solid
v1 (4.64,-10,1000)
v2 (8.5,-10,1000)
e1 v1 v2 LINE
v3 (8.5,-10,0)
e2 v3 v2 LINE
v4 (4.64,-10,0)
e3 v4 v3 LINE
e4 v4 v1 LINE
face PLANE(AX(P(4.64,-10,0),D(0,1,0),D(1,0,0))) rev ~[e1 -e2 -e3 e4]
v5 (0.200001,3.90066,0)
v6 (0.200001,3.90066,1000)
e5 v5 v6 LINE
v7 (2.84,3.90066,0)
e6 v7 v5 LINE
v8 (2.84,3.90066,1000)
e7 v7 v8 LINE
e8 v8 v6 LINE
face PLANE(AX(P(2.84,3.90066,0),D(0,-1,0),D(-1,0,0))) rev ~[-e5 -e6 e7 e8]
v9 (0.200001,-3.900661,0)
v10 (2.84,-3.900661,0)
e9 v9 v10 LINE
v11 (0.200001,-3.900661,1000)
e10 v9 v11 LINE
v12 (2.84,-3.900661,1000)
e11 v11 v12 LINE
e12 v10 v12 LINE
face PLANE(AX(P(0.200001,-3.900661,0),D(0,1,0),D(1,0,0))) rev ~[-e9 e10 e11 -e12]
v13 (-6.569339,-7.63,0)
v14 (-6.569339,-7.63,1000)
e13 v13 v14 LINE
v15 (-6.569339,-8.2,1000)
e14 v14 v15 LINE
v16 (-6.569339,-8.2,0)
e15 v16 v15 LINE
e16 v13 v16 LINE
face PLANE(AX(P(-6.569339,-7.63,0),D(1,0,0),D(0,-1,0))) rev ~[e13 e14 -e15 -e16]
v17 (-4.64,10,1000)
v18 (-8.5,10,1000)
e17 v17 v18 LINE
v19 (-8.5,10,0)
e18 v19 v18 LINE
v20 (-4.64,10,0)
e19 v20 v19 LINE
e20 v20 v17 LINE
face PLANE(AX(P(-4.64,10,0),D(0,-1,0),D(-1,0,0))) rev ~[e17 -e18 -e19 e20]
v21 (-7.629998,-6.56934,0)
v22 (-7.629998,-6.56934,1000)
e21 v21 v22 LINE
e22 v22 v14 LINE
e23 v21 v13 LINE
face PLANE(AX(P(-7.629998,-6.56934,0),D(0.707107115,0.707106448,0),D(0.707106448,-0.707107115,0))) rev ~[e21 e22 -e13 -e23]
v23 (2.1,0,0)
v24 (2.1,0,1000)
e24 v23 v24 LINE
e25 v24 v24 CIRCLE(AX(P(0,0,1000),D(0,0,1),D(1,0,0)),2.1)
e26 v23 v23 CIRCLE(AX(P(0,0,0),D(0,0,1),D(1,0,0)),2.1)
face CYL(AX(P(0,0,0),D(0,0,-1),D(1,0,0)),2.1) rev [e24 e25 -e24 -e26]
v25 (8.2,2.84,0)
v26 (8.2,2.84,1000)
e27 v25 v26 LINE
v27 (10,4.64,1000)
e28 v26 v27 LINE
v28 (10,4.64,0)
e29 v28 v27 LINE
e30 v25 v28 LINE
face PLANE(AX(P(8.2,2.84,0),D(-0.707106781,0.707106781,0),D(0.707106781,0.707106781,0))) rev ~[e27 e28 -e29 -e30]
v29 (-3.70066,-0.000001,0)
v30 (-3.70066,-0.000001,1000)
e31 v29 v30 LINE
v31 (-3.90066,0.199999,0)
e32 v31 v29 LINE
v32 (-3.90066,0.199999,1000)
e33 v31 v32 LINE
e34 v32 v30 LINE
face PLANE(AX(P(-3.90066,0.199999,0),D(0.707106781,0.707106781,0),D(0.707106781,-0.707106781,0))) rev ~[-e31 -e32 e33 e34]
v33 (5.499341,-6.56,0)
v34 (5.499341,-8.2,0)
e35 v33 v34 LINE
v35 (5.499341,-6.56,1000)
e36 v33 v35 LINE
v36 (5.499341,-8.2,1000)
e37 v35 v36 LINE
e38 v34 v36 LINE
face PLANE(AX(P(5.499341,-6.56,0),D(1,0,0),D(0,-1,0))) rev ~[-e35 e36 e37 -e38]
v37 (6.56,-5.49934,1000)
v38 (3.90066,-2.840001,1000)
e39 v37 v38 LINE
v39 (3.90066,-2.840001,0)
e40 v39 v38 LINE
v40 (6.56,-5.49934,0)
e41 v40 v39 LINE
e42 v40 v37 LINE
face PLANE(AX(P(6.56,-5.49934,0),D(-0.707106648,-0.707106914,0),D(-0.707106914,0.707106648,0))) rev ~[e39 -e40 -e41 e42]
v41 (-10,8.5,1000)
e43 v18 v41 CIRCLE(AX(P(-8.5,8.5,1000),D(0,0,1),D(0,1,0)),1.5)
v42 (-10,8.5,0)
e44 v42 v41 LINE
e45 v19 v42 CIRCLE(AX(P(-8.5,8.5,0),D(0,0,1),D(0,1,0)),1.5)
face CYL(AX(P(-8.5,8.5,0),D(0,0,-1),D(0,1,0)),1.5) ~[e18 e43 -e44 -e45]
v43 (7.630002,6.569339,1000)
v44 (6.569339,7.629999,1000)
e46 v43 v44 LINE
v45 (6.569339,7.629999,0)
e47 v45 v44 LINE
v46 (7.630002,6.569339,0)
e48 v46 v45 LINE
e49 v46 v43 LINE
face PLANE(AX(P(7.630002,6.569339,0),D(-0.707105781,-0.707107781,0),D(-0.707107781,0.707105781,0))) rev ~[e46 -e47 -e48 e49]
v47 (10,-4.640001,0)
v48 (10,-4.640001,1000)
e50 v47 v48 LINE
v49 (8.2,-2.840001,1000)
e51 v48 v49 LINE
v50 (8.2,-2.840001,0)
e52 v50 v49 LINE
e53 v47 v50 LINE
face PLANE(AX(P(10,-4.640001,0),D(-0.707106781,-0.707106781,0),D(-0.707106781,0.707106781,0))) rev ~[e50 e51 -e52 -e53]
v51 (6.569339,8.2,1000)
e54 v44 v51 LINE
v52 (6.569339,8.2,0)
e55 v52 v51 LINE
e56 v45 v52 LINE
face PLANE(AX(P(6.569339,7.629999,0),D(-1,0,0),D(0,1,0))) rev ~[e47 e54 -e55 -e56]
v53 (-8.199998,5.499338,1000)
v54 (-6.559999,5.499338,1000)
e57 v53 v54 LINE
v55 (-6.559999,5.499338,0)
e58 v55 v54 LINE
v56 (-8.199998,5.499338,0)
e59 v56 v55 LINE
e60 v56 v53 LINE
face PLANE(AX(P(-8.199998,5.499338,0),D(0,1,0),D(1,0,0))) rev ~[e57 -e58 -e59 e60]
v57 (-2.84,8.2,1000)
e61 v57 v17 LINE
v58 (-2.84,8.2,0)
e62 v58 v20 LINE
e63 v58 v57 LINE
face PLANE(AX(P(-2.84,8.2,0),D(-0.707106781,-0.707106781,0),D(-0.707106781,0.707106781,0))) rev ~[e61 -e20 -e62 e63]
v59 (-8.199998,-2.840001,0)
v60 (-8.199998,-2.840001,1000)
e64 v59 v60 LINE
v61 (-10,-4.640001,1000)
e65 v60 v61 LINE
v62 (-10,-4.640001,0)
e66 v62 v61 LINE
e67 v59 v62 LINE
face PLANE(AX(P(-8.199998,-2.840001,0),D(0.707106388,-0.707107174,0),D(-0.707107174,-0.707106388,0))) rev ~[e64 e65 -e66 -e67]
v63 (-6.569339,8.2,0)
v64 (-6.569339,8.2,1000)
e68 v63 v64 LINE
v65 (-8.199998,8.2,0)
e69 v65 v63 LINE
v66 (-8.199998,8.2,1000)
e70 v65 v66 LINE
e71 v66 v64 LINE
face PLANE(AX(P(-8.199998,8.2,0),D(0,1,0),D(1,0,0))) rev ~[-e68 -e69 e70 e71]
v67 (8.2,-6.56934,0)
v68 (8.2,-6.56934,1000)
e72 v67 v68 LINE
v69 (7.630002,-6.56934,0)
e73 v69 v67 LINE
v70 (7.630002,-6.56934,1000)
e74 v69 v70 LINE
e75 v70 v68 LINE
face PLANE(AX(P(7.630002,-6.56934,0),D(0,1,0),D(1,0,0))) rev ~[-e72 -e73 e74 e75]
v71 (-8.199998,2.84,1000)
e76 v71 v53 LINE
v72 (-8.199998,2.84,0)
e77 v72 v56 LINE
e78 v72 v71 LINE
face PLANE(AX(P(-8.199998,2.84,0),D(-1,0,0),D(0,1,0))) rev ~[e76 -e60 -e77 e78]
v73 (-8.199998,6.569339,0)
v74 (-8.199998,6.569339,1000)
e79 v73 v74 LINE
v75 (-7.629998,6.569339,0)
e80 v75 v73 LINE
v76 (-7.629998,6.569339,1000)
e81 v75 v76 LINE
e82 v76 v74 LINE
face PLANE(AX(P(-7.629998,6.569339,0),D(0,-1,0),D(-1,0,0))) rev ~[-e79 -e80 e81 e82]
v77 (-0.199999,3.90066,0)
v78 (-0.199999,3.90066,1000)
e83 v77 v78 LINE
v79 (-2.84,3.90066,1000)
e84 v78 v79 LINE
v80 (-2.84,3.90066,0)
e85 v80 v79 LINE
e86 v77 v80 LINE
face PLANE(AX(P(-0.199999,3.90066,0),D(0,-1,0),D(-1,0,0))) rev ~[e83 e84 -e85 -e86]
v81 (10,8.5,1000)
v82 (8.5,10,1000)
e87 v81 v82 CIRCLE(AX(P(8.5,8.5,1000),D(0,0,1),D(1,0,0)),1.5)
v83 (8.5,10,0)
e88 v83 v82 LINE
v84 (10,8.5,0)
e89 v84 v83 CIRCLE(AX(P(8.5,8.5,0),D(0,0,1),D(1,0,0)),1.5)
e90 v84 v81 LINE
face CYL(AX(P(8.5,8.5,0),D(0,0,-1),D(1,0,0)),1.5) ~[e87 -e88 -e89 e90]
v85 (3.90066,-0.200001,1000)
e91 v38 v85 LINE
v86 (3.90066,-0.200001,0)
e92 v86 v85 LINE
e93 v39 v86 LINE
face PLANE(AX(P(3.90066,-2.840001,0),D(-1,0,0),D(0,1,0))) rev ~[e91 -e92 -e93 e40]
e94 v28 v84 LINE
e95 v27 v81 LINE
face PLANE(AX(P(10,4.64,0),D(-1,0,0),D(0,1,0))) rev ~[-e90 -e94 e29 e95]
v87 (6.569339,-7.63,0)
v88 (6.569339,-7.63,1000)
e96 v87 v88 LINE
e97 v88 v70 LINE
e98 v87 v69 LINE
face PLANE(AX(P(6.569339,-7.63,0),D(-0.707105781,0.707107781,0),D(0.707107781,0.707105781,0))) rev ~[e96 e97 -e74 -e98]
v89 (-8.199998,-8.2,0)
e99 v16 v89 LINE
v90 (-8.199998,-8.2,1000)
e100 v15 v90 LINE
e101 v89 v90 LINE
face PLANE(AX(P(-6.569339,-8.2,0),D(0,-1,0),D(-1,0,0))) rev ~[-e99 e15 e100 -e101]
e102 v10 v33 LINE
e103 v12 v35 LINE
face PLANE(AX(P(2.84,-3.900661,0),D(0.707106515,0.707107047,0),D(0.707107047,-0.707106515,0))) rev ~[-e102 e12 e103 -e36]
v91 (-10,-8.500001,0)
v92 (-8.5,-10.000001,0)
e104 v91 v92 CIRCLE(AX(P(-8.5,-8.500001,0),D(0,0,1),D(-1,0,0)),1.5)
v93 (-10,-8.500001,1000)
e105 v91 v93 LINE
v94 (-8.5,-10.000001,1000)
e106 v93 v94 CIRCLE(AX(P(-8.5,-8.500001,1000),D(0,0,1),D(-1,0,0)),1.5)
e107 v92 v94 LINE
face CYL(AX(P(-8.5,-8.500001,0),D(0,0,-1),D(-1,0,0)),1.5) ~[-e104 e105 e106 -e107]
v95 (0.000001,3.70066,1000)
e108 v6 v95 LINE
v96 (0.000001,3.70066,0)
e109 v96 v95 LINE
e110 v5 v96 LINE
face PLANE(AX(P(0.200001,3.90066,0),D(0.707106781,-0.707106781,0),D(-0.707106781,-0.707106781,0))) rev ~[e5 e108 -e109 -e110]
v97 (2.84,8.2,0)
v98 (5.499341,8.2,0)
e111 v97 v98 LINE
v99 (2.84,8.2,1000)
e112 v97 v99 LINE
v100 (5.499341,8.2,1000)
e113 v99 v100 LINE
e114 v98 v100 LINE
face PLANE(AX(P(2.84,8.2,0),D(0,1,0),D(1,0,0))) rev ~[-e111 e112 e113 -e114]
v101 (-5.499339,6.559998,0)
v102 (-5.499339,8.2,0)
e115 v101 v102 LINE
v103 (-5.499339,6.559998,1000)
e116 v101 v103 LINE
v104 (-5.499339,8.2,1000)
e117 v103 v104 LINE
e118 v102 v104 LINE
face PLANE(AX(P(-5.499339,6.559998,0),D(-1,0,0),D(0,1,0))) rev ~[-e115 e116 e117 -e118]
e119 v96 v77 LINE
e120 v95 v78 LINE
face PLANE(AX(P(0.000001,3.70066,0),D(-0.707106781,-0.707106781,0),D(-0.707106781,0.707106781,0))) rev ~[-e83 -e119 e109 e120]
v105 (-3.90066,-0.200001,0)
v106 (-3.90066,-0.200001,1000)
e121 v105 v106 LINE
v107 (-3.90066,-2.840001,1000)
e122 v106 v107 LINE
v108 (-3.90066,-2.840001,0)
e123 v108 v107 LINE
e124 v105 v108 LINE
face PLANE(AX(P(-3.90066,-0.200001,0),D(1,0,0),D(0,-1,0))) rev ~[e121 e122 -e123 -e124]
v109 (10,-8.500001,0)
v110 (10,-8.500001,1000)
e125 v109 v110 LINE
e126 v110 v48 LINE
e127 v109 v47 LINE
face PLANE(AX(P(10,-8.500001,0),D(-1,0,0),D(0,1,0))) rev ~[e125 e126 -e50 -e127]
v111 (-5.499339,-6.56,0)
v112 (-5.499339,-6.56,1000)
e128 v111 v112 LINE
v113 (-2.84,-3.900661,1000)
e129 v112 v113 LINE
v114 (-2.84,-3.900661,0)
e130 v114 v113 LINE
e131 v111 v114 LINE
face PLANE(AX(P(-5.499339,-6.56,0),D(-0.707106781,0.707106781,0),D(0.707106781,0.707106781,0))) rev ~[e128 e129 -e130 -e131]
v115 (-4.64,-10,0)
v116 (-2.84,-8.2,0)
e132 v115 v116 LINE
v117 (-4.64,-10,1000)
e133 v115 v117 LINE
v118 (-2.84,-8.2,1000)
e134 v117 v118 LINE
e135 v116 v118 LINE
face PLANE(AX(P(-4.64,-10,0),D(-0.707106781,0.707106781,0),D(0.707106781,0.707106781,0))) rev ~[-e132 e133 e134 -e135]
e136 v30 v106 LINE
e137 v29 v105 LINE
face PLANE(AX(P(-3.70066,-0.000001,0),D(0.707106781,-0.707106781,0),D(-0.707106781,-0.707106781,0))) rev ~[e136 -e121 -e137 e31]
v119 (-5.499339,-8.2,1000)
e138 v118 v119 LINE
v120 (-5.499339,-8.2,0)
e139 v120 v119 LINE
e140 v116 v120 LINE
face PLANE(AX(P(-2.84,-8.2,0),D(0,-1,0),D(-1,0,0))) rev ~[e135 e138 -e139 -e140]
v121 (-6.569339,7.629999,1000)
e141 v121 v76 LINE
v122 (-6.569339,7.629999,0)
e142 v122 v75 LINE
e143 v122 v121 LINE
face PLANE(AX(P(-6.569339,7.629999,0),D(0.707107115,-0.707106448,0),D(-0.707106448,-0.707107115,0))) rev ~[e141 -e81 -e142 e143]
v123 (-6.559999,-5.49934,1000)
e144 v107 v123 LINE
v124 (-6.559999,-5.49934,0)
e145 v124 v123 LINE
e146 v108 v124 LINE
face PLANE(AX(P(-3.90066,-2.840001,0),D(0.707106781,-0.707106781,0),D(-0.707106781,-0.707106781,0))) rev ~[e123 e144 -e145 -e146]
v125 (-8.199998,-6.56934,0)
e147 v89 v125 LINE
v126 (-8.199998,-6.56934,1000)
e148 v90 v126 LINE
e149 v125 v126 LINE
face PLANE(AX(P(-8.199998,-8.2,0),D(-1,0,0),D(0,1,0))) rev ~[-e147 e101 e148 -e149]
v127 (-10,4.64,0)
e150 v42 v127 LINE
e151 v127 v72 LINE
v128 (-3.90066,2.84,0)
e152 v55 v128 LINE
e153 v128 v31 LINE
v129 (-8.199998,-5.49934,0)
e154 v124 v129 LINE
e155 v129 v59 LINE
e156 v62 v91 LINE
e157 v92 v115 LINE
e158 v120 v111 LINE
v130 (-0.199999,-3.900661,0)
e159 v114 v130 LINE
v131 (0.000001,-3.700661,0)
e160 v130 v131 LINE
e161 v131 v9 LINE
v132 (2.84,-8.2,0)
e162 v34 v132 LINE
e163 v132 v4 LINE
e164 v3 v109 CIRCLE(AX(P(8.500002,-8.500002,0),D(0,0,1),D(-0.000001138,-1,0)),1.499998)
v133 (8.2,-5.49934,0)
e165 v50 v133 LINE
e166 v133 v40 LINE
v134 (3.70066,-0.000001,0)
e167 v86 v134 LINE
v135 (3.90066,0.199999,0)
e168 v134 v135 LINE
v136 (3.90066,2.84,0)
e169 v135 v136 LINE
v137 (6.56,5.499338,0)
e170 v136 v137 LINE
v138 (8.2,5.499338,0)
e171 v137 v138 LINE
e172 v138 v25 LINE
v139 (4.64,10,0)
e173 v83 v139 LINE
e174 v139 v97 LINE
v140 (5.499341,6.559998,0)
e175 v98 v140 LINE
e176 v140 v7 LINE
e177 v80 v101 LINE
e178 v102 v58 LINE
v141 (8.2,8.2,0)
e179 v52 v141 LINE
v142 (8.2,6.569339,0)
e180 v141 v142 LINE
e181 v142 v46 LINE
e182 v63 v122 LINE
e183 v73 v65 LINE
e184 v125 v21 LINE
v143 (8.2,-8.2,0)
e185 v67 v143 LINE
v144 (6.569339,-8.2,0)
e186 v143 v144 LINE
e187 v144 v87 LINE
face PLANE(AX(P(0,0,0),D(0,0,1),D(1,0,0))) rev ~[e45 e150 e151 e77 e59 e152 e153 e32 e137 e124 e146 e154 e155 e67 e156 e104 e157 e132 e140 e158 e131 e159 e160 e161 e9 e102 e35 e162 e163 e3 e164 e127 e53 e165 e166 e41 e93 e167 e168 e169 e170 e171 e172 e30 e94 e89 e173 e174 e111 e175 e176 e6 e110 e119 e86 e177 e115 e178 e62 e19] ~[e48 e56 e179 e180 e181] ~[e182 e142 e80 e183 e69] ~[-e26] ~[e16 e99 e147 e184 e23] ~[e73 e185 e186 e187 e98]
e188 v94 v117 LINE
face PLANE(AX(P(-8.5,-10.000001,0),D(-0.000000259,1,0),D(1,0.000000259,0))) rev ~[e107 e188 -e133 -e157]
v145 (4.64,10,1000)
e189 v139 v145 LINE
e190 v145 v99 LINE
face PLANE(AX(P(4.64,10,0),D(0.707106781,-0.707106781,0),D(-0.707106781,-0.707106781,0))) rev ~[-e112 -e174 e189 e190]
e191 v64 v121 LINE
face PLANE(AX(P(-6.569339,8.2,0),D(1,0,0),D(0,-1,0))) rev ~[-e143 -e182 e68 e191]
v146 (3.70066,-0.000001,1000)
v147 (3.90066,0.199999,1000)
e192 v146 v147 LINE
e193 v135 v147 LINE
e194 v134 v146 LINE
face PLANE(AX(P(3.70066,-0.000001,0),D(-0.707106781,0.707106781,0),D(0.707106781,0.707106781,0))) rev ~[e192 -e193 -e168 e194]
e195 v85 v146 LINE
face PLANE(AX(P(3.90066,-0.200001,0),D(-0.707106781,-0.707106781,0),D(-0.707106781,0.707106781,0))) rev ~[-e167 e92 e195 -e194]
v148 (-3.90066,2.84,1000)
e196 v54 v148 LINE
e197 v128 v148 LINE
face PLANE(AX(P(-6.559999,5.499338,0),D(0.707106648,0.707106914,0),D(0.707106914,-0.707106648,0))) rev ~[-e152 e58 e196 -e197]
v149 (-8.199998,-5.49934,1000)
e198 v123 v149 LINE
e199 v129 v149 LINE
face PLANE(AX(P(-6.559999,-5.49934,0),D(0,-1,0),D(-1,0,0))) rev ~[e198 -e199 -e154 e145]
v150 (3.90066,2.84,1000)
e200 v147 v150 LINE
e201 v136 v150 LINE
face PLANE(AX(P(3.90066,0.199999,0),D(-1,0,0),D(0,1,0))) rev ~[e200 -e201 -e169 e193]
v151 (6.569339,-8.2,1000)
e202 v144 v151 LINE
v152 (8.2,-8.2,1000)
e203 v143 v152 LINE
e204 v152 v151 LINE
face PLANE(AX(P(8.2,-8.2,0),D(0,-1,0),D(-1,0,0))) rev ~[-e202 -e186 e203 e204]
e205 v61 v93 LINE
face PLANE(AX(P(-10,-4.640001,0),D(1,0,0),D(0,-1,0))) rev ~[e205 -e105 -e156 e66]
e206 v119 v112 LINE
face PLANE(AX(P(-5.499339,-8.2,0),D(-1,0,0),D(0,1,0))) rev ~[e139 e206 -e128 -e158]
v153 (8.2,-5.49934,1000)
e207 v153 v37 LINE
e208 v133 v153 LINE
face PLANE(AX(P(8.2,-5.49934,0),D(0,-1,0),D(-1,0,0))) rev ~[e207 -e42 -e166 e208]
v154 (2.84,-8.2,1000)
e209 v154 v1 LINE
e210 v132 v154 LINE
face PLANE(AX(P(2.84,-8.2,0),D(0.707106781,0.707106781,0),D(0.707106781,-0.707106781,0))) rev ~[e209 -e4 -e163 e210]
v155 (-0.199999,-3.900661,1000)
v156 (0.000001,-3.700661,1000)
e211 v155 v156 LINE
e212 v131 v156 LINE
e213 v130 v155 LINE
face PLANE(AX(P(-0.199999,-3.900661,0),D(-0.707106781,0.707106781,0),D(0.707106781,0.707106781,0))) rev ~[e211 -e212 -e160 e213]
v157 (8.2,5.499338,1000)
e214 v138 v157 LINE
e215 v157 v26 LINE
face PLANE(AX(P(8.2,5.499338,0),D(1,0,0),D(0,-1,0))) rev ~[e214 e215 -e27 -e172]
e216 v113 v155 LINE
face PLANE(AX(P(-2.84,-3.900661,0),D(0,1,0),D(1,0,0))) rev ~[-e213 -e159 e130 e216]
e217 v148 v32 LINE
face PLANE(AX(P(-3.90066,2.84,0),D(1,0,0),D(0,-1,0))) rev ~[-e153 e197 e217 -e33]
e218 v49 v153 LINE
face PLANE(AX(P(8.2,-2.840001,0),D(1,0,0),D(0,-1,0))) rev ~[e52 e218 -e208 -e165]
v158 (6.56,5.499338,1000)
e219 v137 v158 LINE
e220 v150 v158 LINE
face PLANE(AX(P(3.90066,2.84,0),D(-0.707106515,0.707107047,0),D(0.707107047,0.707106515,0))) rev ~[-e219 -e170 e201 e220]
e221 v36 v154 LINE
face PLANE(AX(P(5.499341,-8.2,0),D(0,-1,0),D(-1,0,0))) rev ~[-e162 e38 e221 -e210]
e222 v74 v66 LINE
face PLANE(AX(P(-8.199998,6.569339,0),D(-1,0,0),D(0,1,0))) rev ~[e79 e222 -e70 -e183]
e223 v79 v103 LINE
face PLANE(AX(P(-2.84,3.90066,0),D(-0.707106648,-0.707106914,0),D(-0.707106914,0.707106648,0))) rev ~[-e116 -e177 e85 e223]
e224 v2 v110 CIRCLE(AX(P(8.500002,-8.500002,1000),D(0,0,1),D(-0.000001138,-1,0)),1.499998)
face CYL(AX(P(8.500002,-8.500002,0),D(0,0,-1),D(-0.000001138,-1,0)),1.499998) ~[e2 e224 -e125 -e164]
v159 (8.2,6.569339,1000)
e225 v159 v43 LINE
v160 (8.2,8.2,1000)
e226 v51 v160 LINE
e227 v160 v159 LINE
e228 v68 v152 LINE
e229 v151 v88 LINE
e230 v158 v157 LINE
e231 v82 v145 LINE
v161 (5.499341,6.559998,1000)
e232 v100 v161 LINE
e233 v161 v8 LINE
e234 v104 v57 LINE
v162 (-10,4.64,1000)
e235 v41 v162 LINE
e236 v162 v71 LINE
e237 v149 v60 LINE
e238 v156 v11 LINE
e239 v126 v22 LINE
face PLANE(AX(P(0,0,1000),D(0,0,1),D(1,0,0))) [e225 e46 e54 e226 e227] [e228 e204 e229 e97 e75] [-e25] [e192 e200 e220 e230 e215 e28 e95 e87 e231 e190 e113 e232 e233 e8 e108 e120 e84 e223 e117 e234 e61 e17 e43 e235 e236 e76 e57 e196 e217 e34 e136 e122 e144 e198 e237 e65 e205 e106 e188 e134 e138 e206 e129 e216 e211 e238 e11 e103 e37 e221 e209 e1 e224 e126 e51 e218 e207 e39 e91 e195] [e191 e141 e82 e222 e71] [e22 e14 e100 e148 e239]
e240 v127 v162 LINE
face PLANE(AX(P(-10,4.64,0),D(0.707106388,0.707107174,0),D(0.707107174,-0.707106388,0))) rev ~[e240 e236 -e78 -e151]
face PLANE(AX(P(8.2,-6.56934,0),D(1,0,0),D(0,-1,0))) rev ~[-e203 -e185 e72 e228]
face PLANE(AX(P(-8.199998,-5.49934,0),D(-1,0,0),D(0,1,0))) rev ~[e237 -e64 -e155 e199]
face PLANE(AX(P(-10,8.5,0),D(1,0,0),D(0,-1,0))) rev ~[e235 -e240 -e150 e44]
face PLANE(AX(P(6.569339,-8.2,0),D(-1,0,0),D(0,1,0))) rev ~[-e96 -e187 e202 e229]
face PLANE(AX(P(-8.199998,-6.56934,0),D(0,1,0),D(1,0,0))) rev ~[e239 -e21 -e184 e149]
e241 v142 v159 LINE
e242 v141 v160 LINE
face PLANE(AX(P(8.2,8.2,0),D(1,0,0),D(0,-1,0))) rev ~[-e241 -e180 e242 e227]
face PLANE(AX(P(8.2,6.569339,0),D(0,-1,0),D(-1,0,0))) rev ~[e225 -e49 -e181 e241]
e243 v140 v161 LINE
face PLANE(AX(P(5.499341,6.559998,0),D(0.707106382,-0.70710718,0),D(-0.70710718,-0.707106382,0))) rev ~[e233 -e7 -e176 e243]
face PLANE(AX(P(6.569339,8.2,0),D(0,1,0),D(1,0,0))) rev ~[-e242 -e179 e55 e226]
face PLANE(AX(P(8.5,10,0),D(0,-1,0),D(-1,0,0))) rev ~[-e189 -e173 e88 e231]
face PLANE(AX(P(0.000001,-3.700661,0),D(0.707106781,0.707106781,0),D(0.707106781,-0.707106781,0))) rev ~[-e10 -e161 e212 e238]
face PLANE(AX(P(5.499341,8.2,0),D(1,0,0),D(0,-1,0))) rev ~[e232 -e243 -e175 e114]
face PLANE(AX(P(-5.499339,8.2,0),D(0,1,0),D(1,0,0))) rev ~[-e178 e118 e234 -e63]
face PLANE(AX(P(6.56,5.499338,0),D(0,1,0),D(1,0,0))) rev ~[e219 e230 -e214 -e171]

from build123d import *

# Parameters (mm, degrees)
F0_R     = 2.09999979
F1_DEPTH = 1000


# Not quite as in the source:
# - ends of sketch curves that miss each other by under 0.0002 mm in the source are joined


with BuildPart() as f1:
    # F0 (on Top) → F1 (new body)
    with BuildSketch(Plane.XY):
        with BuildLine():
            Line((-4.639999536, 10), (-8.50000015, 10))
            ThreePointArc((-8.50000015, 10), (-9.5606602157, 9.5606602157), (-10, 8.50000015))
            Line((-10, 8.50000015), (-10, 4.639999536))
            Line((-10, 4.639999536), (-8.19999818, 2.839999716))
            Line((-8.19999818, 2.839999716), (-8.19999818, 5.4993384501))
            Line((-8.19999818, 5.4993384501), (-6.559999344, 5.4993384501))
            Line((-6.559999344, 5.4993384501), (-3.9006596099, 2.839999716))
            Line((-3.9006596099, 2.839999716), (-3.9006596099, 0.19999898))
            Line((-3.9006596099, 0.19999898), (-3.7006596299, -1e-06))
            Line((-3.7006596299, -1e-06), (-3.9006596099, -0.20000098))
            Line((-3.9006596099, -0.20000098), (-3.9006596099, -2.840000716))
            Line((-3.9006596099, -2.840000716), (-6.559999344, -5.4993404501))
            Line((-6.559999344, -5.4993404501), (-8.19999818, -5.4993404501))
            Line((-8.19999818, -5.4993404501), (-8.19999818, -2.840000716))
            Line((-8.19999818, -2.840000716), (-10, -4.640000536))
            Line((-10, -4.640000536), (-10, -8.50000115))
            ThreePointArc((-10, -8.50000115), (-9.5606602157, -9.5606612157), (-8.50000015, -10.000001))
            Line((-8.50000015, -10.000001), (-4.639999536, -10))
            Line((-4.639999536, -10), (-2.839999716, -8.20000018))
            Line((-2.839999716, -8.20000018), (-5.4993394501, -8.20000018))
            Line((-5.4993394501, -8.20000018), (-5.4993394501, -6.560000344))
            Line((-5.4993394501, -6.560000344), (-2.839999716, -3.9006606099))
            Line((-2.839999716, -3.9006606099), (-0.19999898, -3.9006606099))
            Line((-0.19999898, -3.9006606099), (1e-06, -3.7006606299))
            Line((1e-06, -3.7006606299), (0.20000098, -3.9006606099))
            Line((0.20000098, -3.9006606099), (2.839999716, -3.9006606099))
            Line((2.839999716, -3.9006606099), (5.4993414501, -6.560000344))
            Line((5.4993414501, -6.560000344), (5.4993414501, -8.20000018))
            Line((5.4993414501, -8.20000018), (2.839999716, -8.20000018))
            Line((2.839999716, -8.20000018), (4.639999536, -10))
            Line((4.639999536, -10), (8.50000015, -10))
            ThreePointArc((8.50000015, -10), (9.5606602157, -9.5606612157), (10, -8.50000115))
            Line((10, -8.50000115), (10, -4.640000536))
            Line((10, -4.640000536), (8.20000018, -2.840000716))
            Line((8.20000018, -2.840000716), (8.20000018, -5.4993404501))
            Line((8.20000018, -5.4993404501), (6.560000344, -5.4993404501))
            Line((6.560000344, -5.4993404501), (3.9006596099, -2.840000716))
            Line((3.9006596099, -2.840000716), (3.9006596099, -0.20000098))
            Line((3.9006596099, -0.20000098), (3.7006596299, -1e-06))
            Line((3.7006596299, -1e-06), (3.9006596099, 0.19999898))
            Line((3.9006596099, 0.19999898), (3.9006596099, 2.839999716))
            Line((3.9006596099, 2.839999716), (6.560000344, 5.4993384501))
            Line((6.560000344, 5.4993384501), (8.20000018, 5.4993384501))
            Line((8.20000018, 5.4993384501), (8.20000018, 2.839999716))
            Line((8.20000018, 2.839999716), (10, 4.639999536))
            Line((10, 4.639999536), (10, 8.50000015))
            ThreePointArc((10, 8.50000015), (9.5606602157, 9.5606602157), (8.50000015, 10))
            Line((8.50000015, 10), (4.639999536, 10))
            Line((4.639999536, 10), (2.839999716, 8.20000018))
            Line((2.839999716, 8.20000018), (5.4993414501, 8.20000018))
            Line((5.4993414501, 8.20000018), (5.4993414501, 6.559998344))
            Line((5.4993414501, 6.559998344), (2.839999716, 3.9006596099))
            Line((2.839999716, 3.9006596099), (0.20000098, 3.9006596099))
            Line((0.20000098, 3.9006596099), (1e-06, 3.7006596299))
            Line((1e-06, 3.7006596299), (-0.19999898, 3.9006596099))
            Line((-0.19999898, 3.9006596099), (-2.839999716, 3.9006596099))
            Line((-2.839999716, 3.9006596099), (-5.4993394501, 6.559998344))
            Line((-5.4993394501, 6.559998344), (-5.4993394501, 8.20000018))
            Line((-5.4993394501, 8.20000018), (-2.839999716, 8.20000018))
            Line((-2.839999716, 8.20000018), (-4.639999536, 10))
        make_face()
        Polygon((-6.5693393431, -8.20000018), (-8.19999818, -8.20000018), (-8.19999818, -6.5693403431), (-7.629998237, -6.5693403431), (-6.5693393431, -7.630000237), align=None, mode=Mode.SUBTRACT)
        Polygon((8.20000018, -8.20000018), (6.5693393431, -8.20000018), (6.5693393431, -7.630000237), (7.630002237, -6.5693403431), (8.20000018, -6.5693403431), align=None, mode=Mode.SUBTRACT)
        with Locations((1e-06, -1e-06)):
            Circle(F0_R, mode=Mode.SUBTRACT)
        Polygon((-8.19999818, 8.20000018), (-6.5693393431, 8.20000018), (-6.5693393431, 7.629999237), (-7.629998237, 6.5693393431), (-8.19999818, 6.5693393431), align=None, mode=Mode.SUBTRACT)
        Polygon((6.5693393431, 8.20000018), (8.20000018, 8.20000018), (8.20000018, 6.5693393431), (7.630002237, 6.5693393431), (6.5693393431, 7.629999237), align=None, mode=Mode.SUBTRACT)
    extrude(amount=F1_DEPTH)


solid = f1.part
